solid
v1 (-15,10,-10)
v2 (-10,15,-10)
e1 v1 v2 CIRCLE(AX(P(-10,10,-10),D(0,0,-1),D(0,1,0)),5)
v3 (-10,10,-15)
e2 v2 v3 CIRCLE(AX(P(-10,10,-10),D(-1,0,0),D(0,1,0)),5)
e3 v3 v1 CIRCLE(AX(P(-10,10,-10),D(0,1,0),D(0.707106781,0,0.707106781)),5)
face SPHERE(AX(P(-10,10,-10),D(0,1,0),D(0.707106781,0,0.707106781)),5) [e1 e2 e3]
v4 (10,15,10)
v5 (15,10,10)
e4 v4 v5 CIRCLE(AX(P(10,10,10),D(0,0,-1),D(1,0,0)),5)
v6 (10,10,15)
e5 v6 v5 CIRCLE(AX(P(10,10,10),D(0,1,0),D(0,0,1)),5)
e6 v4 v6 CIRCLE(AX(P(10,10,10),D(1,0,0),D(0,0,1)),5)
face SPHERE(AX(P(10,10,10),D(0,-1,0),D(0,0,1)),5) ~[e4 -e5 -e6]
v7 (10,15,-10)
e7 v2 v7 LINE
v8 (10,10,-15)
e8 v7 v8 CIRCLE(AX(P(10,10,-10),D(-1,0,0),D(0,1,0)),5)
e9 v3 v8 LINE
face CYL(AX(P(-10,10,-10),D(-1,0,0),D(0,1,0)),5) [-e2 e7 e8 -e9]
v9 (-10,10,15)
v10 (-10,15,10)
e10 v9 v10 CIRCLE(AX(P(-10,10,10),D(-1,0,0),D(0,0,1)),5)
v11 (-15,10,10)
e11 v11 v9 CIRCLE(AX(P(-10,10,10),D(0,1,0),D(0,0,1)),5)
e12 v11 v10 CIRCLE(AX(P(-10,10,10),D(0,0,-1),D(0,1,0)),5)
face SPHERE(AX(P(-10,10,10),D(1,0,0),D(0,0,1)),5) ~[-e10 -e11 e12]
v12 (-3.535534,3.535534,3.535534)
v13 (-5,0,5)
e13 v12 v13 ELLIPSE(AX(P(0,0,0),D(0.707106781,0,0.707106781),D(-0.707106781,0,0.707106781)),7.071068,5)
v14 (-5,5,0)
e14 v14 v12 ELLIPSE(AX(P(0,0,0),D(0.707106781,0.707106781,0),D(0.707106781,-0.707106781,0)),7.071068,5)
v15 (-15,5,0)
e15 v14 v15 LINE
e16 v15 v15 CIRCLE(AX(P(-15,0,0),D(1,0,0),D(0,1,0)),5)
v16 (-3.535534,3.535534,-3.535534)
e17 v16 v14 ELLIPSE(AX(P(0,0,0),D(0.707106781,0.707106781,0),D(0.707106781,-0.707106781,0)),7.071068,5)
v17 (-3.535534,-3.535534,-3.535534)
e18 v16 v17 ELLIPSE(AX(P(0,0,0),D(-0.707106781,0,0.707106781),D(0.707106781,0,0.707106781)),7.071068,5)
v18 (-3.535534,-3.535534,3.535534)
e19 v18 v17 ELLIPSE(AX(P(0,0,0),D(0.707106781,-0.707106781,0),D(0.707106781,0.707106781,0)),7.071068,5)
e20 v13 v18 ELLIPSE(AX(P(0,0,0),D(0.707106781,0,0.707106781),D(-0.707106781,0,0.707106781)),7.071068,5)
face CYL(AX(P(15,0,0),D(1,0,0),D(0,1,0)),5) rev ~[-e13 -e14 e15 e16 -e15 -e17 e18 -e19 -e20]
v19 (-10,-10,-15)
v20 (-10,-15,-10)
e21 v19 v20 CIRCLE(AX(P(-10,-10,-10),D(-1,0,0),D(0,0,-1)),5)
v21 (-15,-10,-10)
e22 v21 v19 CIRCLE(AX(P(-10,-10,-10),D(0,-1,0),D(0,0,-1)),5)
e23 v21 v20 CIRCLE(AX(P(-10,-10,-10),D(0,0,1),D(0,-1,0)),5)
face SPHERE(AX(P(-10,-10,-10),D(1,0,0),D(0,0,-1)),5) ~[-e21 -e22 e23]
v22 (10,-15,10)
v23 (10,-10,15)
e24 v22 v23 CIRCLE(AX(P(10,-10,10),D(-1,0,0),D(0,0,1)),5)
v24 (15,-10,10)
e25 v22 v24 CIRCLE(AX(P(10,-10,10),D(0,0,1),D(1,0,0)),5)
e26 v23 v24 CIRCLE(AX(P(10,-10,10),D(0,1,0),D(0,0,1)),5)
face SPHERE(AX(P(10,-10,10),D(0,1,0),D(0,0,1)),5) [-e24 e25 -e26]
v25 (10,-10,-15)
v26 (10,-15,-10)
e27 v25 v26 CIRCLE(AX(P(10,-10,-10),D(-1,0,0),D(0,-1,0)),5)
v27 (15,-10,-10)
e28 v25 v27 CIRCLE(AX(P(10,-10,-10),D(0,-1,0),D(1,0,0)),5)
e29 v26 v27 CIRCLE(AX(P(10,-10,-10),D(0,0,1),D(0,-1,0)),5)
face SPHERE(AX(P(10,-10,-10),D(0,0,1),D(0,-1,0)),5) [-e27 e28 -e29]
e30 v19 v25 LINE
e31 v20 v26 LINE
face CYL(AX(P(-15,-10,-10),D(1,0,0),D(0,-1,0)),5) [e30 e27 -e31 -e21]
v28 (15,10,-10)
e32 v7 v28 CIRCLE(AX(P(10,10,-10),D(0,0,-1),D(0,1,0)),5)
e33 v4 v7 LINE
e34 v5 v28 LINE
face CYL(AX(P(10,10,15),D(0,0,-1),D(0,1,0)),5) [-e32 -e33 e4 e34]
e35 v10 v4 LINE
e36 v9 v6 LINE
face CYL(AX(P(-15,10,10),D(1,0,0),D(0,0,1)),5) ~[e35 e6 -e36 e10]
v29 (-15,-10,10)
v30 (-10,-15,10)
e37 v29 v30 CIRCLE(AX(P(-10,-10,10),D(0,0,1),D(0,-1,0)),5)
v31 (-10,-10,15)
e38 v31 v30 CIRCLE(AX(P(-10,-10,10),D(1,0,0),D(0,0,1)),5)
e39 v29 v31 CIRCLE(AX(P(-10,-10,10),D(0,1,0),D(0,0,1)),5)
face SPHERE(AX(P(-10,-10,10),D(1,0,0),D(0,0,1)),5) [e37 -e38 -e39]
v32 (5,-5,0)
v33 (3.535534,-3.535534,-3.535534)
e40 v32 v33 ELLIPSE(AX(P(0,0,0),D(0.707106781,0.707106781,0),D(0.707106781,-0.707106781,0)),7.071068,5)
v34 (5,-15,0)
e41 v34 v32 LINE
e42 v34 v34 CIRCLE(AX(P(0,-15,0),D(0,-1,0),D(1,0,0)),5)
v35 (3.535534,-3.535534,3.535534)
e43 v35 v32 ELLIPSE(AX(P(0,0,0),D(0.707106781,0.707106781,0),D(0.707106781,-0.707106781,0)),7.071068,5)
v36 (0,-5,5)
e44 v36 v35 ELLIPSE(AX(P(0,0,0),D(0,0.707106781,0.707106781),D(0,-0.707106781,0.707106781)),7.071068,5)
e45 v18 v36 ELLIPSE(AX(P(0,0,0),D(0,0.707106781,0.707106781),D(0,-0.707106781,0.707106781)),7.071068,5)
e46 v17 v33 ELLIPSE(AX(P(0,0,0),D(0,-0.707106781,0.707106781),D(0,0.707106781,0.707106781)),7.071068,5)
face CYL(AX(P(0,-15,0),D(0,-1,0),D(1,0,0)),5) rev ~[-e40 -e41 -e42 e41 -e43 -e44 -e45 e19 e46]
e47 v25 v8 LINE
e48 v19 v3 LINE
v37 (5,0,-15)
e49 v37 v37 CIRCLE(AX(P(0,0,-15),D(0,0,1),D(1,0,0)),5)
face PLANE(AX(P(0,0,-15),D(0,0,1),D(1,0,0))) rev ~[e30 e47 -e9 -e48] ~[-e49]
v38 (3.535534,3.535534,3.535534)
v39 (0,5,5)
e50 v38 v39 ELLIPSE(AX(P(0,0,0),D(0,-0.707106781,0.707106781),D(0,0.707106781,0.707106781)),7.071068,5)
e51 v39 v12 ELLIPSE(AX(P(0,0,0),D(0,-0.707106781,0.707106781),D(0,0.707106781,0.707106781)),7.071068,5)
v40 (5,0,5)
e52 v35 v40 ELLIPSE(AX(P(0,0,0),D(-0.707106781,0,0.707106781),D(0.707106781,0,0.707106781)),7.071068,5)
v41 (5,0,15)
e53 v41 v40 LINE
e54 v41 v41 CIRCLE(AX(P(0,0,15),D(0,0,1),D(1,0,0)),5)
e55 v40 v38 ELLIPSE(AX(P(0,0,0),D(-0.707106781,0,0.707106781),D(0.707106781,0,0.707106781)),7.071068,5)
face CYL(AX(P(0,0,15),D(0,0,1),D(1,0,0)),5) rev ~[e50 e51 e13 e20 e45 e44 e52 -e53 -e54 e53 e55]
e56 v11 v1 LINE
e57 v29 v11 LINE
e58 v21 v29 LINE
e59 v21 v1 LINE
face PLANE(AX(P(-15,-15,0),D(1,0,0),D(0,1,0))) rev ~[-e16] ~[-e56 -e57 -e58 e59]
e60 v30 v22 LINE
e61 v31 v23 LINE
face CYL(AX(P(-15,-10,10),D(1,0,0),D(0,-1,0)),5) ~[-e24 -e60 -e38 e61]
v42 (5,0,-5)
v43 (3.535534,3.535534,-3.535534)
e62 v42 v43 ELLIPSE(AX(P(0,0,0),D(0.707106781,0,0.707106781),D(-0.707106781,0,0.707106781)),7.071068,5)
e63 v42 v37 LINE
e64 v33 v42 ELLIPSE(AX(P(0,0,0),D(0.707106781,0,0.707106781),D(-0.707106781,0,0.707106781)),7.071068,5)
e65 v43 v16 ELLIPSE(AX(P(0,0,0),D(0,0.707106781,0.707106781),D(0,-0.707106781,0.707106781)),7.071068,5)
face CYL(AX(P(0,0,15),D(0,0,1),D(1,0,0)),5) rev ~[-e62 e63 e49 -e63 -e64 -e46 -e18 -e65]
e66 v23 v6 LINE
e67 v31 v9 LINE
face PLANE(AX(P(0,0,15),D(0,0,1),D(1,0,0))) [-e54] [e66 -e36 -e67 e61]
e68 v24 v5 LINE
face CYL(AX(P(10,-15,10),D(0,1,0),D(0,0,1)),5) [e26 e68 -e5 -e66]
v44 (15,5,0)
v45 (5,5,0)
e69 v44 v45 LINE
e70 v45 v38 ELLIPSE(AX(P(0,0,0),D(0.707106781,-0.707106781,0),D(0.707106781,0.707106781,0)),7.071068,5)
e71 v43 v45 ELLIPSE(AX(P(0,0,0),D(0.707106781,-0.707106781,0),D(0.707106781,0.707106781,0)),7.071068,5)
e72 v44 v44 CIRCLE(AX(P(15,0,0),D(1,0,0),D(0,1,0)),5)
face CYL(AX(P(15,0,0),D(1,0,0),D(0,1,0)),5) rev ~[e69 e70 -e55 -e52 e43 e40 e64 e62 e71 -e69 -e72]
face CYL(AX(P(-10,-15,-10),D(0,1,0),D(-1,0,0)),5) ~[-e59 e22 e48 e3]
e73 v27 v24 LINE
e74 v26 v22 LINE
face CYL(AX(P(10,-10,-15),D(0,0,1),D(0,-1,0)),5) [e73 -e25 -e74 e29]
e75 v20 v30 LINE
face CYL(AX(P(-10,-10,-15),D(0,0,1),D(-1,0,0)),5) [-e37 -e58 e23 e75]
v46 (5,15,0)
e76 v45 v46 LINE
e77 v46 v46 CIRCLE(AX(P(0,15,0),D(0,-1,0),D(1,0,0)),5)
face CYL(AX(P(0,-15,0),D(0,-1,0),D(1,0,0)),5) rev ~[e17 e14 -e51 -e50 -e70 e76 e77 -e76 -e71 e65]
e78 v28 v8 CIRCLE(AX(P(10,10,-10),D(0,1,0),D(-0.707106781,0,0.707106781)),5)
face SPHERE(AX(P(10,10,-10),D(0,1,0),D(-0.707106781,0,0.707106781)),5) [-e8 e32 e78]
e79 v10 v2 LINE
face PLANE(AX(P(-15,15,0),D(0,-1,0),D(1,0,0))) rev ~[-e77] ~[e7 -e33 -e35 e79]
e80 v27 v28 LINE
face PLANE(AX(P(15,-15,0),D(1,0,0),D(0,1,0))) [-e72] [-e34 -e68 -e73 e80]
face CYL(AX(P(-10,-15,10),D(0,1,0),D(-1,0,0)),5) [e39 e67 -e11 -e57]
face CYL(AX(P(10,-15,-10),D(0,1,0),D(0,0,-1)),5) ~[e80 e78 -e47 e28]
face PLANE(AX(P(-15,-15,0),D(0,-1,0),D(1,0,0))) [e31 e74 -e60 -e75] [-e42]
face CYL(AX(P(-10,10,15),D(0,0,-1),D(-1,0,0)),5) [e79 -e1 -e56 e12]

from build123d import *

# Parameters (mm, degrees)
F0_W         = 30
F0_H         = 30
F1_DEPTH     = 15
F2_R         = 5
F3_DEPTH     = 30.001
F4_R         = 5
F5_DEPTH     = 30.001
F6_R         = 5
F7_DEPTH     = 30.001
F8_R         = 5
F9_T1_DEPTH  = 20
F9_S5_W      = 5
F9_S5_H      = 5
F9_T6_DEPTH  = 5
F9_S11_W     = 5
F9_S11_H     = 5
F9_T12_DEPTH = 5


# Not quite as in the source:
# - a fillet or chamfer that OpenCascade refuses, or shapes differently, is made with other operations: its cross-section is extruded or revolved along the edge and cut away or added


with BuildPart() as f1:
    # F0 (on Top) → F1 (new body, symmetric)
    with BuildSketch(Plane.XY):
        Rectangle(F0_W, F0_H)
    extrude(amount=F1_DEPTH, both=True)

    # F2 (on face) → F3 (cut, through all)
    with BuildSketch(Plane.XY.offset(15)):
        Circle(F2_R)
    extrude(amount=-F3_DEPTH, mode=Mode.SUBTRACT)

    # F4 (on face) → F5 (cut, through all)
    with BuildSketch(Plane.YZ.offset(15)):
        Circle(F4_R)
    extrude(amount=-F5_DEPTH, mode=Mode.SUBTRACT)

    # F6 (on face) → F7 (cut, through all)
    with BuildSketch(Plane.XZ.offset(15)):
        Circle(F6_R)
    extrude(amount=-F7_DEPTH, mode=Mode.SUBTRACT)

    # F8
    f8_edges = [f1.edges().sort_by_distance(p)[0] for p in [
        (15, 0, 15),
        (0, 15, 15),
        (0, -15, 15),
        (-15, 0, 15),
        (-15, 15, 0),
        (15, -15, 0),
        (0, -15, -15),
        (-15, 0, -15),
        (15, 15, 0),
        (15, 0, -15),
        (-15, -15, 0),
    ]]
    fillet(f8_edges, radius=F8_R)

    # F9: fillet of radius 5 on 1 edges, made by hand

    # F9_s2 → F9_t1 (cut)
    with BuildSketch(Plane.YZ.offset(-10)):
        with BuildLine():
            ThreePointArc((15, -10), (13.5355339059, -13.5355339059), (10, -15))
            Line((10, -15), (15, -15))
            Line((15, -15), (15, -10))
        make_face()
    extrude(amount=F9_T1_DEPTH, mode=Mode.SUBTRACT)


with BuildPart() as f9_tool4:
    # F9_s5 → F9_t6 (new body)
    with BuildSketch(Plane.XZ.offset(-10)):
        with Locations((12.5, -12.5)):
            Rectangle(F9_S5_W, F9_S5_H)
    extrude(amount=-F9_T6_DEPTH)

    # F9_s7 → F9_t8 (revolve, cut)
    with BuildSketch(Plane(origin=(10, 10, -10), x_dir=(-0.7071067812, 0, 0.7071067812), z_dir=(-0.7071067812, 0, -0.7071067812))):
        with BuildLine():
            ThreePointArc((0, -5), (5, 0), (0, 5))
            Line((0, 5), (0, -5))
        make_face()
    revolve(axis=Axis((10, 10, -10), (0, 1, 0)), mode=Mode.SUBTRACT)


with BuildPart() as f1_1:
    add(f1.part)

    # F9_t3: cut F9_tool4
    add(f9_tool4.part, mode=Mode.SUBTRACT)


with BuildPart() as f9_tool10:
    # F9_s11 → F9_t12 (new body)
    with BuildSketch(Plane.XZ.offset(-10)):
        with Locations((-12.5, -12.5)):
            Rectangle(F9_S11_W, F9_S11_H)
    extrude(amount=-F9_T12_DEPTH)

    # F9_s13 → F9_t14 (revolve, cut)
    with BuildSketch(Plane(origin=(-10, 10, -10), x_dir=(0.7071067812, 0, 0.7071067812), z_dir=(-0.7071067812, 0, 0.7071067812))):
        with BuildLine():
            ThreePointArc((0, -5), (5, 0), (0, 5))
            Line((0, 5), (0, -5))
        make_face()
    revolve(axis=Axis((-10, 10, -10), (0, 1, 0)), mode=Mode.SUBTRACT)


with BuildPart() as f1_2:
    add(f1_1.part)

    # F9_t9: cut F9_tool10
    add(f9_tool10.part, mode=Mode.SUBTRACT)


solid = f1_2.part
